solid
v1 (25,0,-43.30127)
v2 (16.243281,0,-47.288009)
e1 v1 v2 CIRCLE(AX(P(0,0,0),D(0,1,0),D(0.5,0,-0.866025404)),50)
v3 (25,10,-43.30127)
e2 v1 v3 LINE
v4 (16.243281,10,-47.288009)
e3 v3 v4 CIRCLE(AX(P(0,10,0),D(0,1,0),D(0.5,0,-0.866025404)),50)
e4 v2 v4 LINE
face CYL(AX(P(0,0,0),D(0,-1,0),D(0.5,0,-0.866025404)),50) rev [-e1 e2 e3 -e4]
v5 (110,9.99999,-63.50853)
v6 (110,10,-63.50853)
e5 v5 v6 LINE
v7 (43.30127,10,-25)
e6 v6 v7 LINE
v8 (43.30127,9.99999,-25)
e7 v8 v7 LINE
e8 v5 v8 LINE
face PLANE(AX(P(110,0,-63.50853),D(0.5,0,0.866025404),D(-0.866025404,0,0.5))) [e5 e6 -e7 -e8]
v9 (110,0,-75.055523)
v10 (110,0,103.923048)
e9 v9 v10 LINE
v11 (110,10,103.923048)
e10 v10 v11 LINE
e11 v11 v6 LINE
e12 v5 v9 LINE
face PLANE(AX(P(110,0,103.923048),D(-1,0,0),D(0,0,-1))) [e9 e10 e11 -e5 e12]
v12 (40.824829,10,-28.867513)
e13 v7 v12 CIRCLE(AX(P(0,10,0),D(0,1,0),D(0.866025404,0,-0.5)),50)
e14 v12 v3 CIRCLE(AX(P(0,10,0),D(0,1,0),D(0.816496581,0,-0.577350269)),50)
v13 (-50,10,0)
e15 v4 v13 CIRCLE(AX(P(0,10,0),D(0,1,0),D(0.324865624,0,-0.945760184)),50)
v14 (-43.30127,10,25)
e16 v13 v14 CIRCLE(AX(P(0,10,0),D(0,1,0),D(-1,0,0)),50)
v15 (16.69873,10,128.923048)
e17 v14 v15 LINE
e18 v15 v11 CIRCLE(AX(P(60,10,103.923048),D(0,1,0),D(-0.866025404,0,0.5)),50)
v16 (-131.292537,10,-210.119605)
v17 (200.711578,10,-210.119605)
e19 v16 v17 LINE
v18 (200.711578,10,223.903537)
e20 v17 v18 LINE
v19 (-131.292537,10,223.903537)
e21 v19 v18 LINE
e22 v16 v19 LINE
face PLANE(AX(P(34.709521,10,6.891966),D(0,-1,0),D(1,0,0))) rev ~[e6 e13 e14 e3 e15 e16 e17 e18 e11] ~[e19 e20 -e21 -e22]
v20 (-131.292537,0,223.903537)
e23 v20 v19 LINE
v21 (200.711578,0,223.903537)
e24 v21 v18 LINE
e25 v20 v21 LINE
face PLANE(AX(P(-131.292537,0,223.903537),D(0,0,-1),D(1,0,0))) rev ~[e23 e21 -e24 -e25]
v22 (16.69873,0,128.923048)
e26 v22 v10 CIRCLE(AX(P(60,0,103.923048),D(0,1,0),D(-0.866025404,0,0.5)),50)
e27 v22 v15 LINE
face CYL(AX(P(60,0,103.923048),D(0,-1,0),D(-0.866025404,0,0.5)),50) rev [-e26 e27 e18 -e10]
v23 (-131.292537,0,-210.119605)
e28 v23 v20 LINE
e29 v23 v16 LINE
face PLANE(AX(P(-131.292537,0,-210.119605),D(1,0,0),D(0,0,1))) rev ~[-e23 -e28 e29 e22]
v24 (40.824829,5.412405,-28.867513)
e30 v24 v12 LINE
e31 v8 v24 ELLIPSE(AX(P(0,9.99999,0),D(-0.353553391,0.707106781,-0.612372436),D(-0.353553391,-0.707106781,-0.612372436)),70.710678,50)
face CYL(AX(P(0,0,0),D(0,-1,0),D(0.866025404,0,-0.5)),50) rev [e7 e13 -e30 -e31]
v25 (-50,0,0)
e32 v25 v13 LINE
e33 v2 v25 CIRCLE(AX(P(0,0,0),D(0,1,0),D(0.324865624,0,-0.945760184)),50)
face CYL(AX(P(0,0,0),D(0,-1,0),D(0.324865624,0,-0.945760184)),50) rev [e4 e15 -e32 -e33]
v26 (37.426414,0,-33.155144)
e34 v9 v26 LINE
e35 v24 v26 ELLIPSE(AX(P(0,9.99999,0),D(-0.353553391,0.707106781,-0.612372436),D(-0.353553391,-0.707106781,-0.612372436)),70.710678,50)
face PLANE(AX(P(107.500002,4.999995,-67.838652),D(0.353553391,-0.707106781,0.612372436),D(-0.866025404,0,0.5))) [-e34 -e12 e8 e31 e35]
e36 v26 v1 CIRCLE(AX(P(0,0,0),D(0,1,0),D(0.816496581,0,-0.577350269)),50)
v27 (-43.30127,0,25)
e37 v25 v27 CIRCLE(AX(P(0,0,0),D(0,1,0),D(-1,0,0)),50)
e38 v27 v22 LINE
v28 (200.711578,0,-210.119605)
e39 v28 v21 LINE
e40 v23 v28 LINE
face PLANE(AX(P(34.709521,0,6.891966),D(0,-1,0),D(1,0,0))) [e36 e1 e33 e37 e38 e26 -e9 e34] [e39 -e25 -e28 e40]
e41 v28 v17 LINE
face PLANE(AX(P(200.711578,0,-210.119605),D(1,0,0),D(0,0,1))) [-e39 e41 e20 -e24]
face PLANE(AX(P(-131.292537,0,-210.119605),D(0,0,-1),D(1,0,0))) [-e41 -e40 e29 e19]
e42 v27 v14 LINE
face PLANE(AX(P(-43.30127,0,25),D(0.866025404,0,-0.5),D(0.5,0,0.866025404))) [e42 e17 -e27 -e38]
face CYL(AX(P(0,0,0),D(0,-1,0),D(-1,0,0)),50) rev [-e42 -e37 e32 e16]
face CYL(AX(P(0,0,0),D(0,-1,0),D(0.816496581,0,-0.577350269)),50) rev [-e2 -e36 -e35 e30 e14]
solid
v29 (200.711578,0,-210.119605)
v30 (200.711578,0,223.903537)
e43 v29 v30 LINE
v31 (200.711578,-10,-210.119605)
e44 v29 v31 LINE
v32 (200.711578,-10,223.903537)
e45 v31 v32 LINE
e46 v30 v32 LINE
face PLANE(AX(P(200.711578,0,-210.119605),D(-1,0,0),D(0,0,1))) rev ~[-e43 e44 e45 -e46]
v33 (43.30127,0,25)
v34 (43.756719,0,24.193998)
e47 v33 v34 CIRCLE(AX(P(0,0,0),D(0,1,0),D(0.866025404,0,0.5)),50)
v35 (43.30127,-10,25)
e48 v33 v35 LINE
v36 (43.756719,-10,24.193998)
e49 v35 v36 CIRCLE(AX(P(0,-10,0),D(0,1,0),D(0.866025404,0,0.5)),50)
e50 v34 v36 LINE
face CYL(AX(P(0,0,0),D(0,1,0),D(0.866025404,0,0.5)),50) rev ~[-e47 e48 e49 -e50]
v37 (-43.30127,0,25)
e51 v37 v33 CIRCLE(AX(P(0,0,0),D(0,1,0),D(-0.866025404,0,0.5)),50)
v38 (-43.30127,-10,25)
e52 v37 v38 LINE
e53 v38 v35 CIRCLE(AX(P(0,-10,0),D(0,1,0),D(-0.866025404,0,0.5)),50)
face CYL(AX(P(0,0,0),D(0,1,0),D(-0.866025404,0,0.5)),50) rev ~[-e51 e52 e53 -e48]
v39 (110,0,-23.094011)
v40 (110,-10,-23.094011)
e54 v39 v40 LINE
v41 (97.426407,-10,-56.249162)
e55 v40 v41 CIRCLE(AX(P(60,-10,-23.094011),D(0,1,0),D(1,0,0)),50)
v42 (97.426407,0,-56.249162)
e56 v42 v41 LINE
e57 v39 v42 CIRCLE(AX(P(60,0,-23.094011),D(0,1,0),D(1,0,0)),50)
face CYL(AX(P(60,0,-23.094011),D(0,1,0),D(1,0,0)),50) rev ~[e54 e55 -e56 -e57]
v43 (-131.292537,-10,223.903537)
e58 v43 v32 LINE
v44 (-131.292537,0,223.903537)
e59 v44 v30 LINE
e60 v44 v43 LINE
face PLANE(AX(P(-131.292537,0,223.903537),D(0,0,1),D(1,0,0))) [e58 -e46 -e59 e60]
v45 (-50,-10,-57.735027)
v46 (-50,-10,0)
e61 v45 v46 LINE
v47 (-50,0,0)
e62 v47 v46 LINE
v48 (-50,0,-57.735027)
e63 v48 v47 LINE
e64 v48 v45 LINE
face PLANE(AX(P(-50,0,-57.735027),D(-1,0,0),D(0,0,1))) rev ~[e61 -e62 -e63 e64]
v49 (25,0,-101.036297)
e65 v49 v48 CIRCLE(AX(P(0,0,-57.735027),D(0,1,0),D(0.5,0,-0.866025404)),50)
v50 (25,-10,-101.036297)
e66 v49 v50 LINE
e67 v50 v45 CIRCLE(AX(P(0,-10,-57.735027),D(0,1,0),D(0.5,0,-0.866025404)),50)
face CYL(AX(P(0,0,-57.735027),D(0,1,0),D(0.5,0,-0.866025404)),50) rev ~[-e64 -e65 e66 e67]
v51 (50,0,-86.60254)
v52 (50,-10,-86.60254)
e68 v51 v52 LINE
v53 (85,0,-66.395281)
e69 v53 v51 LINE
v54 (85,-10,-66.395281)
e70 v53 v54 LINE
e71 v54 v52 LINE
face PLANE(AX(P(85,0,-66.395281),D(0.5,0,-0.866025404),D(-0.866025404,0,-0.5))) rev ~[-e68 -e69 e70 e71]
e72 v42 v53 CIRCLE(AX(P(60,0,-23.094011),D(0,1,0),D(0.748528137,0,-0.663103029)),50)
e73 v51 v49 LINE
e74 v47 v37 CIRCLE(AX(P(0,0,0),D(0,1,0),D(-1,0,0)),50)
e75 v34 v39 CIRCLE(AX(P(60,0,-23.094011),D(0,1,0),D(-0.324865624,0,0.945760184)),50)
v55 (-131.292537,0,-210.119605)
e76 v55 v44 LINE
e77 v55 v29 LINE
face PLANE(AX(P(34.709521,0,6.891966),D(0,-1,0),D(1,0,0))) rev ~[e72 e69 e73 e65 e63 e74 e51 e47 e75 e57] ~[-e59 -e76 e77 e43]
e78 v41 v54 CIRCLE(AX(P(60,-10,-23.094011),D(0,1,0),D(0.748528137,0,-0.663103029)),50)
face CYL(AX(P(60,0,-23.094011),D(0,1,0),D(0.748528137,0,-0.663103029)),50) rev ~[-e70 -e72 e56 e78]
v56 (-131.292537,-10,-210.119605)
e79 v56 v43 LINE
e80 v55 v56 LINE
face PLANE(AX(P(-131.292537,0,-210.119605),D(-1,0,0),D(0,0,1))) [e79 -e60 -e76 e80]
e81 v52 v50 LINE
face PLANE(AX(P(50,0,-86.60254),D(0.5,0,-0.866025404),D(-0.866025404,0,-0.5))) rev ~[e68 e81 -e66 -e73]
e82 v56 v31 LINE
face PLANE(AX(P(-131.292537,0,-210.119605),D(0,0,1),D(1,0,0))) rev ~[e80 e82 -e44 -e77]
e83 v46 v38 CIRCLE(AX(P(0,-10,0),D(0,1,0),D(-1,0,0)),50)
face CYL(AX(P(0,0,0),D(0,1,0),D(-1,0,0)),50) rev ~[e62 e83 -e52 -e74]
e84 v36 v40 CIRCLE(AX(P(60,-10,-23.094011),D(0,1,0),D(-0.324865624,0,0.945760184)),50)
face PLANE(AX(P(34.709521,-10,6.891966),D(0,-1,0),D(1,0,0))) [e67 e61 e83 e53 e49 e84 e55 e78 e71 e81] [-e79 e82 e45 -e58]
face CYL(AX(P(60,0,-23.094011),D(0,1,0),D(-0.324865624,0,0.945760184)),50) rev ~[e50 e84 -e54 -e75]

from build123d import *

# Parameters (mm, degrees)
F0_W     = 332.0041149855
F0_H     = 434.023141861
F1_DEPTH = 10
F2_DEPTH = 10
F3_SIZE  = 9.99999


# Not quite as in the source:
# - a fillet or chamfer is up to 0.001 mm smaller than in the source, because OpenCascade refuses the exact size


with BuildPart() as f1:
    # F0 (on Front) → F1 (new body)
    with BuildSketch(Plane.XZ):
        with Locations((34.709520638, 6.8919658661)):
            Rectangle(F0_W, F0_H)
        with BuildLine():
            ThreePointArc((-50, 0), (-48.2962913145, 12.9409522551), (-43.3012701892, 25))
            Line((-43.3012701892, 25), (16.6987298108, 128.9230484541))
            ThreePointArc((16.6987298108, 128.9230484541), (72.9409522551, 152.2193397686), (110, 103.9230484541))
            Line((110, 103.9230484541), (110, -23.0940107676))
            Line((110, -23.0940107676), (110, -63.5085296109))
            Line((110, -63.5085296109), (97.4264068712, -56.2491622333))
            ThreePointArc((97.4264068712, -56.2491622333), (91.6227766017, -61.8238442297), (85, -66.3952809568))
            Line((85, -66.3952809568), (50, -86.6025403784))
            Line((50, -86.6025403784), (25, -101.0362971082))
            ThreePointArc((25, -101.0362971082), (-25, -101.0362971082), (-50, -57.735026919))
            Line((-50, -57.735026919), (-50, 0))
        make_face(mode=Mode.SUBTRACT)
        with BuildLine():
            ThreePointArc((-40.8248290464, -28.8675134595), (-47.6510306936, -15.1452723264), (-50, 0))
            Line((-50, 0), (-50, -57.735026919))
            ThreePointArc((-50, -57.735026919), (-47.6510306936, -42.5897545926), (-40.8248290464, -28.8675134595))
        make_face()
        with BuildLine():
            ThreePointArc((16.2432812114, -47.2880092147), (-15.3587691387, -47.582646107), (-40.8248290464, -28.8675134595))
            ThreePointArc((-40.8248290464, -28.8675134595), (-47.6510306936, -42.5897545926), (-50, -57.735026919))
            ThreePointArc((-50, -57.735026919), (-25, -101.0362971082), (25, -101.0362971082))
            ThreePointArc((25, -101.0362971082), (36.9417059287, -91.4293938529), (45.4124145232, -78.6566092486))
            Line((45.4124145232, -78.6566092486), (39.7196014439, -68.7963677572))
            ThreePointArc((39.7196014439, -68.7963677572), (26.2236699558, -59.9607915973), (16.2432812114, -47.2880092147))
        make_face()
        with BuildLine():
            ThreePointArc((25, -43.3012701892), (20.7177600933, -45.5057624561), (16.2432812114, -47.2880092147))
            ThreePointArc((16.2432812114, -47.2880092147), (26.2236699558, -59.9607915973), (39.7196014439, -68.7963677572))
            Line((39.7196014439, -68.7963677572), (25, -43.3012701892))
        make_face()
        with BuildLine():
            ThreePointArc((48.0277563773, -71.6395088353), (43.8111428854, -70.400679487), (39.7196014439, -68.7963677572))
            Line((39.7196014439, -68.7963677572), (45.4124145232, -78.6566092486))
            ThreePointArc((45.4124145232, -78.6566092486), (46.8516414764, -75.1970912576), (48.0277563773, -71.6395088353))
        make_face()
        with BuildLine():
            ThreePointArc((50, -57.735026919), (47.6510306936, -42.5897545926), (40.8248290464, -28.8675134595))
            ThreePointArc((40.8248290464, -28.8675134595), (33.694366934, -36.9417059287), (25, -43.3012701892))
            Line((25, -43.3012701892), (39.7196014439, -68.7963677572))
            ThreePointArc((39.7196014439, -68.7963677572), (43.8111428854, -70.400679487), (48.0277563773, -71.6395088353))
            ThreePointArc((48.0277563773, -71.6395088353), (49.5044837306, -64.756856493), (50, -57.735026919))
        make_face()
        with BuildLine():
            Line((97.4264068712, -56.2491622333), (43.3012701892, -25))
            ThreePointArc((43.3012701892, -25), (42.1074762749, -26.9622039485), (40.8248290464, -28.8675134595))
            ThreePointArc((40.8248290464, -28.8675134595), (47.6510306936, -42.5897545926), (50, -57.735026919))
            ThreePointArc((50, -57.735026919), (49.5044837306, -64.756856493), (48.0277563773, -71.6395088353))
            ThreePointArc((48.0277563773, -71.6395088353), (67.021829574, -72.5984944982), (85, -66.3952809568))
            ThreePointArc((85, -66.3952809568), (91.6227766017, -61.8238442297), (97.4264068712, -56.2491622333))
        make_face()
        with BuildLine():
            Line((50, -86.6025403784), (85, -66.3952809568))
            ThreePointArc((85, -66.3952809568), (67.021829574, -72.5984944982), (48.0277563773, -71.6395088353))
            ThreePointArc((48.0277563773, -71.6395088353), (46.8516414764, -75.1970912576), (45.4124145232, -78.6566092486))
            Line((45.4124145232, -78.6566092486), (50, -86.6025403784))
        make_face()
        with BuildLine():
            ThreePointArc((45.4124145232, -78.6566092486), (36.9417059287, -91.4293938529), (25, -101.0362971082))
            Line((25, -101.0362971082), (50, -86.6025403784))
            Line((50, -86.6025403784), (45.4124145232, -78.6566092486))
        make_face()
    extrude(amount=-F1_DEPTH)

    # F3 (size 10 in the source; OpenCascade refuses exactly that, so slightly less here)
    f3_edges = [f1.edges().sort_by_distance(p)[0] for p in [
        (76.650635, 0, -44.254265),
    ]]
    chamfer(f3_edges, length=F3_SIZE)


with BuildPart() as f2:
    # F0 (on Front) → F2 (new body)
    with BuildSketch(Plane.XZ):
        with Locations((34.709520638, 6.8919658661)):
            Rectangle(F0_W, F0_H)
        with BuildLine():
            ThreePointArc((-50, 0), (-48.2962913145, 12.9409522551), (-43.3012701892, 25))
            Line((-43.3012701892, 25), (16.6987298108, 128.9230484541))
            ThreePointArc((16.6987298108, 128.9230484541), (72.9409522551, 152.2193397686), (110, 103.9230484541))
            Line((110, 103.9230484541), (110, -23.0940107676))
            Line((110, -23.0940107676), (110, -63.5085296109))
            Line((110, -63.5085296109), (97.4264068712, -56.2491622333))
            ThreePointArc((97.4264068712, -56.2491622333), (91.6227766017, -61.8238442297), (85, -66.3952809568))
            Line((85, -66.3952809568), (50, -86.6025403784))
            Line((50, -86.6025403784), (25, -101.0362971082))
            ThreePointArc((25, -101.0362971082), (-25, -101.0362971082), (-50, -57.735026919))
            Line((-50, -57.735026919), (-50, 0))
        make_face(mode=Mode.SUBTRACT)
        with BuildLine():
            ThreePointArc((110, 103.9230484541), (72.9409522551, 152.2193397686), (16.6987298108, 128.9230484541))
            ThreePointArc((16.6987298108, 128.9230484541), (47.0590477449, 55.6267571397), (110, 103.9230484541))
        make_face()
        with BuildLine():
            ThreePointArc((-43.3012701892, 25), (0, 50), (43.3012701892, 25))
            ThreePointArc((43.3012701892, 25), (43.5308599828, 24.5980533612), (43.7567187886, 24.1939984471))
            ThreePointArc((43.7567187886, 24.1939984471), (89.0502662589, 17.6009770108), (110, -23.0940107676))
            Line((110, -23.0940107676), (110, 103.9230484541))
            ThreePointArc((110, 103.9230484541), (47.0590477449, 55.6267571397), (16.6987298108, 128.9230484541))
            Line((16.6987298108, 128.9230484541), (-43.3012701892, 25))
        make_face()
        with BuildLine():
            Line((110, -63.5085296109), (110, -23.0940107676))
            ThreePointArc((110, -23.0940107676), (106.7510446063, -40.8236421292), (97.4264068712, -56.2491622333))
            Line((97.4264068712, -56.2491622333), (110, -63.5085296109))
        make_face()
    extrude(amount=F2_DEPTH)


solid = Compound([f1.part, f2.part])
